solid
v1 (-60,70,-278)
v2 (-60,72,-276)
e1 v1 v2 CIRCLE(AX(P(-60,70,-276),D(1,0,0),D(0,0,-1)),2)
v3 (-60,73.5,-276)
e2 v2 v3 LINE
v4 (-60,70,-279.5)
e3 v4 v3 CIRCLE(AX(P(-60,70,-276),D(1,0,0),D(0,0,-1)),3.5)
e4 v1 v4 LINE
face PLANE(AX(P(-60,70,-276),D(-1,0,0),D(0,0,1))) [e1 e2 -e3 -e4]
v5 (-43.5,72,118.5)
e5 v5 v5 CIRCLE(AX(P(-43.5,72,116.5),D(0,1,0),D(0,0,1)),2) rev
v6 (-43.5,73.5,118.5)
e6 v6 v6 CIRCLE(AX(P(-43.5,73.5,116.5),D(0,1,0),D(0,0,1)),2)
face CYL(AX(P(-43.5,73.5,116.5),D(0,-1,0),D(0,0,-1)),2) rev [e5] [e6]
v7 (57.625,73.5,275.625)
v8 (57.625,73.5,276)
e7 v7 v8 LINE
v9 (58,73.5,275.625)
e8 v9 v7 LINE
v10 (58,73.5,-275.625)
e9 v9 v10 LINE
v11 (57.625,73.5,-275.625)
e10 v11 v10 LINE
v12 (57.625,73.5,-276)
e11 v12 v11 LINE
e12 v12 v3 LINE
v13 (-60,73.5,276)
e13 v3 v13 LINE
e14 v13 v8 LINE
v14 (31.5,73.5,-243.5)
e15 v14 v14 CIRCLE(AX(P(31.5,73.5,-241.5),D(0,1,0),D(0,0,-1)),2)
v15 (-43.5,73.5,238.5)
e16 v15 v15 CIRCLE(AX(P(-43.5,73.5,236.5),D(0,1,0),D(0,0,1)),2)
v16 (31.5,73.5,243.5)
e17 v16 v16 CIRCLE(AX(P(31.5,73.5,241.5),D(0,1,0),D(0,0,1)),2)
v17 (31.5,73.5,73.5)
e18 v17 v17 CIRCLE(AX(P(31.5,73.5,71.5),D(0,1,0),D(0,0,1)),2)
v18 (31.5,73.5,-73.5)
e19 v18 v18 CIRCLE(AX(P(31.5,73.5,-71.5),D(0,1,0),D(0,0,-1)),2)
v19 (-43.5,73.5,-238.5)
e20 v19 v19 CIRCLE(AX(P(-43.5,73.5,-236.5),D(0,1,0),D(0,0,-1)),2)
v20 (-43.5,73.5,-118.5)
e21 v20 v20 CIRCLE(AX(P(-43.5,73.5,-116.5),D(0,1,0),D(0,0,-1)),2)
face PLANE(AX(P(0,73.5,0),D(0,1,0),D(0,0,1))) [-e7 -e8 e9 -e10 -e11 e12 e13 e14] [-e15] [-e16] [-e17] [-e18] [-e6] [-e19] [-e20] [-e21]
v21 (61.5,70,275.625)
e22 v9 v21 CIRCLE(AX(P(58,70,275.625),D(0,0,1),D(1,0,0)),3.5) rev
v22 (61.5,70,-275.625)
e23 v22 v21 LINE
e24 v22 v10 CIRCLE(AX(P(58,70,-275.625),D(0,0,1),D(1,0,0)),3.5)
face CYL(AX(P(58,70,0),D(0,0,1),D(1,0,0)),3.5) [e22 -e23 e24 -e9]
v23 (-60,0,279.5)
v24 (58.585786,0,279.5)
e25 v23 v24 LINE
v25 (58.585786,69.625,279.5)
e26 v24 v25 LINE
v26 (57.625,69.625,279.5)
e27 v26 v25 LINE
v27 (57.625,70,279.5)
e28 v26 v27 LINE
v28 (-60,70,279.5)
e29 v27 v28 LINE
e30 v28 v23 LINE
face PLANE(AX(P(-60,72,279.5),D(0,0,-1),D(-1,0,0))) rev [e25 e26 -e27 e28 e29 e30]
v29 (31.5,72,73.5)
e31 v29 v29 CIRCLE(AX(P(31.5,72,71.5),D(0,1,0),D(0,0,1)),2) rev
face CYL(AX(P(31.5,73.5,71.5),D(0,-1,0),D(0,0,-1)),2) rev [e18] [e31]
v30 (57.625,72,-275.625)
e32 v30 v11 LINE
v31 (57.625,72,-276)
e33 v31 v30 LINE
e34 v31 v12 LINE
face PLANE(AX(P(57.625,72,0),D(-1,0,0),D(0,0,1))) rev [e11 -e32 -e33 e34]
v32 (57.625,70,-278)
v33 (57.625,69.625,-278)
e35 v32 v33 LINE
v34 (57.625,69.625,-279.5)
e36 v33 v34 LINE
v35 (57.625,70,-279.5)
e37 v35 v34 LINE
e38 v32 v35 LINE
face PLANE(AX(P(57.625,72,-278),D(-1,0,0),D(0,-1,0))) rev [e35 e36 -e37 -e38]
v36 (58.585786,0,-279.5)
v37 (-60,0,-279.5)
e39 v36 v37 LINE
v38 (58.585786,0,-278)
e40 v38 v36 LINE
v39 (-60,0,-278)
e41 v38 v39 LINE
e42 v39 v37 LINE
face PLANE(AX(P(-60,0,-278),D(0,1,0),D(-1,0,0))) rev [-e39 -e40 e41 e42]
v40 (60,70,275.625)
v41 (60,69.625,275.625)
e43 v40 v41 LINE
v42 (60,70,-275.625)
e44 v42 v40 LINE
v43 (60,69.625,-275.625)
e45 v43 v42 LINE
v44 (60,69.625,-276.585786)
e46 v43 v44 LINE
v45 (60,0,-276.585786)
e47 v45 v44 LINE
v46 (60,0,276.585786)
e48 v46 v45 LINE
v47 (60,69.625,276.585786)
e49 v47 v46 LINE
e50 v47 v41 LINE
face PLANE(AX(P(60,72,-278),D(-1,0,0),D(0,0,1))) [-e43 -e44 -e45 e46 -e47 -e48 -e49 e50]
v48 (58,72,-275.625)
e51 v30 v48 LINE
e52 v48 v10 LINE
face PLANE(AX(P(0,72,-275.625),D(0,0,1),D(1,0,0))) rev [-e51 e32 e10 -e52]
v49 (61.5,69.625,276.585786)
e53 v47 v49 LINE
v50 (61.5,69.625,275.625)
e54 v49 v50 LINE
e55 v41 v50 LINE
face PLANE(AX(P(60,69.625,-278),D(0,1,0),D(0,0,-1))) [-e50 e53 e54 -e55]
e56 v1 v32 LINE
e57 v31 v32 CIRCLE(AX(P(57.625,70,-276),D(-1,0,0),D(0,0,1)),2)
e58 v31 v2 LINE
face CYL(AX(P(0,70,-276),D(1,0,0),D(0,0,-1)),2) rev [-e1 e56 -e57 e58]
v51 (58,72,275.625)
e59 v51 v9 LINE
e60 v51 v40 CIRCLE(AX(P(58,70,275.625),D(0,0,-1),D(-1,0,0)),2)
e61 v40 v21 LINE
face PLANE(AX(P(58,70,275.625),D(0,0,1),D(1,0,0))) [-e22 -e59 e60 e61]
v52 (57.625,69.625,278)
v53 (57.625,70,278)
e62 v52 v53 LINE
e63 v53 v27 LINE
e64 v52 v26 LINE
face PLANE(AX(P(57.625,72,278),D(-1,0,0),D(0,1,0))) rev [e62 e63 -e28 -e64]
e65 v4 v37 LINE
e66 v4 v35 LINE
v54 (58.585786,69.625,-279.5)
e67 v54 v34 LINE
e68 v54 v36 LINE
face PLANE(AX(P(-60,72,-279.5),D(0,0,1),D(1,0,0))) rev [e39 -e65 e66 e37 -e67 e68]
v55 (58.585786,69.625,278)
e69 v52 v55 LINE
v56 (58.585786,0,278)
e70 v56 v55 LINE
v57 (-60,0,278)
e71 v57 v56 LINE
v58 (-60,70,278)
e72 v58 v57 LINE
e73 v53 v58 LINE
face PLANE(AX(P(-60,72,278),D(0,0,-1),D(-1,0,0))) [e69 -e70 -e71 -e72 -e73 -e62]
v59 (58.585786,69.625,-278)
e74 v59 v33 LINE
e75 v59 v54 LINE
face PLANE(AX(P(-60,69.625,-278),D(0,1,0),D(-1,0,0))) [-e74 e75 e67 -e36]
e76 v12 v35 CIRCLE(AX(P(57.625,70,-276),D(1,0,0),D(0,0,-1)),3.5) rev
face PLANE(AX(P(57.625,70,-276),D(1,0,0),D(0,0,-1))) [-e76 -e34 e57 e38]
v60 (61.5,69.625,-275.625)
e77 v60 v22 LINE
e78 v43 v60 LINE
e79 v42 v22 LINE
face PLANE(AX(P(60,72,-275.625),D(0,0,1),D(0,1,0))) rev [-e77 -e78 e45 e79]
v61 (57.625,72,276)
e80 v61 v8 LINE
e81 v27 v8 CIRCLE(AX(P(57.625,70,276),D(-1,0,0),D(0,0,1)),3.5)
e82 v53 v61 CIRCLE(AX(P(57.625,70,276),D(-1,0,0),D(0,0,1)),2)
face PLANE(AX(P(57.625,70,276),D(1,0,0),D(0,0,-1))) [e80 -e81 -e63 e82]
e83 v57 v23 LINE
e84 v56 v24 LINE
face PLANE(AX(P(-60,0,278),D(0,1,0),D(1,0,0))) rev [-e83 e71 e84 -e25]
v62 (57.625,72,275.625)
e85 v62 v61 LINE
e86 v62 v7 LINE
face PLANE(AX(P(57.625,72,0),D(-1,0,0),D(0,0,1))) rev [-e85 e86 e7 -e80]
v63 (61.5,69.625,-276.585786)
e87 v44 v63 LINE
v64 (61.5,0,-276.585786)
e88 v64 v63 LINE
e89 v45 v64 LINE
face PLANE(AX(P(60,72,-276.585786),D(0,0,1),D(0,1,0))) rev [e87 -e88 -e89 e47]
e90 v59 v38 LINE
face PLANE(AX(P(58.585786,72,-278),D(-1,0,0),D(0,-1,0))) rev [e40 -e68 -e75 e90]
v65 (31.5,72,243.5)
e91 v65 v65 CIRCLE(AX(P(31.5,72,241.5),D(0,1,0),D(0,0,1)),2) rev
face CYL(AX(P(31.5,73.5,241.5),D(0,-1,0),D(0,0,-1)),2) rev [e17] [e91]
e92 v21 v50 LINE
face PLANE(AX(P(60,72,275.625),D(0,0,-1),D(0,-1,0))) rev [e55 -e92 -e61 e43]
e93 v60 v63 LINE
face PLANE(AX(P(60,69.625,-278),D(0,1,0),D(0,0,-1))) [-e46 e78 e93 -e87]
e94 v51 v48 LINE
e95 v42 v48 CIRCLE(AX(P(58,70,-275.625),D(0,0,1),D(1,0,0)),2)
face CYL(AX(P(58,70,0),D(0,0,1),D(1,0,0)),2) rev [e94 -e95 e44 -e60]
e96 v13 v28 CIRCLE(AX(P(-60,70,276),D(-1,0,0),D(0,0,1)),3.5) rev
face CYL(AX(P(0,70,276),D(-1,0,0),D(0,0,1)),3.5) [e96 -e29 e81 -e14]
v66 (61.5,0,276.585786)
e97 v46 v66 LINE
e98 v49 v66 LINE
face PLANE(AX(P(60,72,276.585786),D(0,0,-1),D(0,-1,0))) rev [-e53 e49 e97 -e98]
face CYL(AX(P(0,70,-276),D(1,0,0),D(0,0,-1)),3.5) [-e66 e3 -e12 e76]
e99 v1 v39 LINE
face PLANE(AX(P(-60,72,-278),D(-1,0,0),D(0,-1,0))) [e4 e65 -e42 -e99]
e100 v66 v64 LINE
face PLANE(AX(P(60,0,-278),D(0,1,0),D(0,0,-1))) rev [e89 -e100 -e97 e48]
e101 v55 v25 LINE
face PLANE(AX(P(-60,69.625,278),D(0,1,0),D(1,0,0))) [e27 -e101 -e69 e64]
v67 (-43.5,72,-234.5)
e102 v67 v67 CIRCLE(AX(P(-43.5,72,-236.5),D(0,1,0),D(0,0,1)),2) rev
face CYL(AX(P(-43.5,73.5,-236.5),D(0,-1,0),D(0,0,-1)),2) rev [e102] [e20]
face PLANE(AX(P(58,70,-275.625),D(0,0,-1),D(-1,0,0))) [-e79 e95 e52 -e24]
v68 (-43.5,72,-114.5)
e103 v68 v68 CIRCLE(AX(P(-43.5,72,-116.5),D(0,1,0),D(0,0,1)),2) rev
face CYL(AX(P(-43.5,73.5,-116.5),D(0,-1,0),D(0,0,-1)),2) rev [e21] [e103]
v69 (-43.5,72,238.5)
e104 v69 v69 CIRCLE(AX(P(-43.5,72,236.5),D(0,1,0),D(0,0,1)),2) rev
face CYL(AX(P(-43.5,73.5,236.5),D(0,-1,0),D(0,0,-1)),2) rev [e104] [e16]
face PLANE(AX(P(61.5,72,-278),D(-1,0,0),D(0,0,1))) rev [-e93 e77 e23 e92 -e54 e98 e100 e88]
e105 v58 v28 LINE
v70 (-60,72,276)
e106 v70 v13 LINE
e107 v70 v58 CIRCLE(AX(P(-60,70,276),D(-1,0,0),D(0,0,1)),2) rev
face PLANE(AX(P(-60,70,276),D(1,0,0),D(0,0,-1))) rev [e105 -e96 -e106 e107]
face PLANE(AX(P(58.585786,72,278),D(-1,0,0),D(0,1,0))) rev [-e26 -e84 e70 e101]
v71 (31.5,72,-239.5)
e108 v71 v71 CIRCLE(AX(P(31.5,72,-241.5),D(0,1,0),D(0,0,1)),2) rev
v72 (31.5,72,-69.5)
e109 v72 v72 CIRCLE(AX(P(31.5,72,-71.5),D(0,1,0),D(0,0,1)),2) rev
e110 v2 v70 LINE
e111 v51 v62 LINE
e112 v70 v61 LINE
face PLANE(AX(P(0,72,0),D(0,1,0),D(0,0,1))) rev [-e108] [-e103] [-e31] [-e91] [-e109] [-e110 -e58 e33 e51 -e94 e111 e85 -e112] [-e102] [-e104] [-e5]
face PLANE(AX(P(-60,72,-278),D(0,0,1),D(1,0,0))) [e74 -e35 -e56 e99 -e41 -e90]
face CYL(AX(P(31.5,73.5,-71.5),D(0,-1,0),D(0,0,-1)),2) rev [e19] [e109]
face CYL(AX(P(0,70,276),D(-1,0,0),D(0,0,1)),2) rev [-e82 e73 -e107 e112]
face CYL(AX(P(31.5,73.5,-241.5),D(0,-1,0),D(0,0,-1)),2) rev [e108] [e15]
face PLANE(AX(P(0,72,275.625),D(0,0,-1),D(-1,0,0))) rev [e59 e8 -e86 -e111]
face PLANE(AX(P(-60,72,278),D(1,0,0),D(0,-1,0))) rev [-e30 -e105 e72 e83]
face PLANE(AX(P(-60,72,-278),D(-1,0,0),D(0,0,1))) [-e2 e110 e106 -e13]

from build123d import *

# Parameters (mm, degrees)
SKETCH_1_W                  = 120
SKETCH_1_H                  = 556
EXTRUDE_1_DEPTH             = 72
SHEET_START                 = 58.585786438
SHEET_METAL_1_DEPTH         = 2.914213562
SHEET_START_2               = -60
SHEET_METAL_1_2_DEPTH       = 118
SHEET_START_3               = 57.625
SHEET_METAL_1_3_DEPTH       = 0.960786438
SHEET_METAL_1_4_DEPTH       = 117.625
SHEET_METAL_1_5_OUTLINE_W   = 69.625
SHEET_METAL_1_5_OUTLINE_H   = 1.5
SHEET_METAL_1_5_OUTLINE_W_2 = 1.5
SHEET_METAL_1_5_OUTLINE_H_2 = 551.25
SHEET_METAL_1_5_DEPTH       = 0.375
SHEET_METAL_1_6_OUTLINE_W   = 69.625
SHEET_METAL_1_6_OUTLINE_H   = 1.5
SHEET_METAL_1_6_DEPTH       = 0.960786438
SHEET_START_4               = -276.585786438
SHEET_METAL_1_7_DEPTH       = 553.171572876
SHEET_START_5               = -275.625
SHEET_METAL_1_8_DEPTH       = 551.25
SHEET_METAL_1_9_OUTLINE_W   = 1.5
SHEET_METAL_1_9_OUTLINE_H   = 69.625
SHEET_METAL_1_9_DEPTH       = 553.171572876
SKETCH_6_R                  = 2
CUT_EXTRUDE_1_DEPTH         = 296.473772102


with BuildPart() as part:
    # Sketch 1 → 凸台-拉伸1 (new body)
    with BuildSketch(Plane(origin=(0, 0, 0), x_dir=(1, 0, 0), z_dir=(0, 1, 0))):
        Rectangle(SKETCH_1_W, SKETCH_1_H)
    extrude(amount=EXTRUDE_1_DEPTH)

    # Sheet Metal 1: read off the stored shape, not the designer's step
    # Sheet Metal 1 outline → Sheet Metal 1 (cut)
    with BuildSketch(Plane.YZ.offset(SHEET_START)):
        with BuildLine():
            Line((0, 279.5), (0, 276.585786438))
            Line((0, 276.585786438), (69.625, 276.585786438))
            Line((69.625, 276.585786438), (69.625, 275.625))
            Line((69.625, 275.625), (73.5, 275.625))
            Line((73.5, 275.625), (73.5, 276))
            ThreePointArc((73.5, 276), (72.474873734, 278.474873734), (70, 279.5))
            Line((70, 279.5), (69.625, 279.5))
            Line((69.625, 279.5), (0, 279.5))
        make_face()
        with BuildLine():
            Line((69.625, -276.585786438), (0, -276.585786438))
            Line((0, -276.585786438), (0, -279.5))
            Line((0, -279.5), (69.625, -279.5))
            Line((69.625, -279.5), (70, -279.5))
            ThreePointArc((70, -279.5), (72.474873734, -278.474873734), (73.5, -276))
            Line((73.5, -276), (73.5, -275.625))
            Line((73.5, -275.625), (69.625, -275.625))
            Line((69.625, -275.625), (69.625, -276.585786438))
        make_face()
    extrude(amount=SHEET_METAL_1_DEPTH, mode=Mode.SUBTRACT)

    # Sheet Metal 1 2 outline → Sheet Metal 1 2 (cut)
    with BuildSketch(Plane.YZ.offset(SHEET_START_2)):
        with BuildLine():
            Line((0, 278), (0, -278))
            Line((0, -278), (70, -278))
            ThreePointArc((70, -278), (71.414213562, -277.414213562), (72, -276))
            Line((72, -276), (72, 276))
            ThreePointArc((72, 276), (71.414213562, 277.414213562), (70, 278))
            Line((70, 278), (0, 278))
        make_face()
    extrude(amount=SHEET_METAL_1_2_DEPTH, mode=Mode.SUBTRACT)

    # Sheet Metal 1 3 outline → Sheet Metal 1 3 (cut)
    with BuildSketch(Plane.YZ.offset(SHEET_START_3)):
        Polygon((0, 278), (0, 276.585786438), (69.625, 276.585786438), (69.625, 275.625), (72, 275.625), (72, 278), align=None)
        Polygon((69.625, -276.585786438), (0, -276.585786438), (0, -278), (72, -278), (72, -275.625), (69.625, -275.625), align=None)
    extrude(amount=SHEET_METAL_1_3_DEPTH, mode=Mode.SUBTRACT)

    # Sheet Metal 1 4 outline → Sheet Metal 1 4 (add)
    with BuildSketch(Plane.YZ.offset(SHEET_START_2)):
        with BuildLine():
            Line((0, 279.5), (0, 278))
            Line((0, 278), (72, 278))
            Line((72, 278), (72, -278))
            Line((72, -278), (0, -278))
            Line((0, -278), (0, -279.5))
            Line((0, -279.5), (70, -279.5))
            ThreePointArc((70, -279.5), (72.474873734, -278.474873734), (73.5, -276))
            Line((73.5, -276), (73.5, 276))
            ThreePointArc((73.5, 276), (72.474873734, 278.474873734), (70, 279.5))
            Line((70, 279.5), (0, 279.5))
        make_face()
    extrude(amount=SHEET_METAL_1_4_DEPTH)

    # Sheet Metal 1 5 outline → Sheet Metal 1 5 (add)
    with BuildSketch(Plane.YZ.offset(SHEET_START_3)):
        with Locations((34.8125, 278.75)):
            Rectangle(SHEET_METAL_1_5_OUTLINE_W, SHEET_METAL_1_5_OUTLINE_H)
        with Locations((34.8125, -278.75)):
            Rectangle(SHEET_METAL_1_5_OUTLINE_W, SHEET_METAL_1_5_OUTLINE_H)
        with Locations((72.75, 0)):
            Rectangle(SHEET_METAL_1_5_OUTLINE_W_2, SHEET_METAL_1_5_OUTLINE_H_2)
    extrude(amount=SHEET_METAL_1_5_DEPTH)

    # Sheet Metal 1 6 outline → Sheet Metal 1 6 (add)
    with BuildSketch(Plane.YZ.offset(SHEET_START_3)):
        with Locations((34.8125, 278.75)):
            Rectangle(SHEET_METAL_1_6_OUTLINE_W, SHEET_METAL_1_6_OUTLINE_H)
        with Locations((34.8125, -278.75)):
            Rectangle(SHEET_METAL_1_6_OUTLINE_W, SHEET_METAL_1_6_OUTLINE_H)
    extrude(amount=SHEET_METAL_1_6_DEPTH)

    # Sheet Metal 1 7 outline → Sheet Metal 1 7 (cut)
    with BuildSketch(Plane.XY.offset(SHEET_START_4)):
        with BuildLine():
            Line((58, 0), (60, 0))
            Line((60, 0), (60, 70))
            ThreePointArc((60, 70), (59.414213562, 71.414213562), (58, 72))
            Line((58, 72), (58, 0))
        make_face()
    extrude(amount=SHEET_METAL_1_7_DEPTH, mode=Mode.SUBTRACT)

    # Sheet Metal 1 8 outline → Sheet Metal 1 8 (add)
    with BuildSketch(Plane.XY.offset(SHEET_START_5)):
        with BuildLine():
            Line((60, 0), (61.5, 0))
            Line((61.5, 0), (61.5, 70))
            ThreePointArc((61.5, 70), (60.474873734, 72.474873734), (58, 73.5))
            Line((58, 73.5), (58, 72))
            Line((58, 72), (60, 72))
            Line((60, 72), (60, 0))
        make_face()
    extrude(amount=SHEET_METAL_1_8_DEPTH)

    # Sheet Metal 1 9 outline → Sheet Metal 1 9 (add)
    with BuildSketch(Plane.XY.offset(SHEET_START_4)):
        with Locations((60.75, 34.8125)):
            Rectangle(SHEET_METAL_1_9_OUTLINE_W, SHEET_METAL_1_9_OUTLINE_H)
    extrude(amount=SHEET_METAL_1_9_DEPTH)

    # 草图6 → 切除-拉伸1 (cut, through all)
    with BuildSketch(Plane(origin=(0, 0, 0), x_dir=(1, 0, 0), z_dir=(0, 1, 0))):
        with Locations(Location((-43.5, -236.5, 0), (0, 0, 270))):
            Circle(SKETCH_6_R)
        with Locations(Location((31.5, -241.5, 0), (0, 0, 270))):
            Circle(SKETCH_6_R)
        with Locations(Location((-43.5, -116.5, 0), (0, 0, 270))):
            Circle(SKETCH_6_R)
        with Locations(Location((31.5, -71.5, 0), (0, 0, 270))):
            Circle(SKETCH_6_R)
        with Locations(Location((31.5, 71.5, 0), (0, 0, 90))):
            Circle(SKETCH_6_R)
        with Locations(Location((-43.5, 116.5, 0), (0, 0, 90))):
            Circle(SKETCH_6_R)
        with Locations(Location((31.5, 241.5, 0), (0, 0, 90))):
            Circle(SKETCH_6_R)
        with Locations(Location((-43.5, 236.5, 0), (0, 0, 90))):
            Circle(SKETCH_6_R)
    extrude(amount=CUT_EXTRUDE_1_DEPTH, mode=Mode.SUBTRACT)


solid = part.part
